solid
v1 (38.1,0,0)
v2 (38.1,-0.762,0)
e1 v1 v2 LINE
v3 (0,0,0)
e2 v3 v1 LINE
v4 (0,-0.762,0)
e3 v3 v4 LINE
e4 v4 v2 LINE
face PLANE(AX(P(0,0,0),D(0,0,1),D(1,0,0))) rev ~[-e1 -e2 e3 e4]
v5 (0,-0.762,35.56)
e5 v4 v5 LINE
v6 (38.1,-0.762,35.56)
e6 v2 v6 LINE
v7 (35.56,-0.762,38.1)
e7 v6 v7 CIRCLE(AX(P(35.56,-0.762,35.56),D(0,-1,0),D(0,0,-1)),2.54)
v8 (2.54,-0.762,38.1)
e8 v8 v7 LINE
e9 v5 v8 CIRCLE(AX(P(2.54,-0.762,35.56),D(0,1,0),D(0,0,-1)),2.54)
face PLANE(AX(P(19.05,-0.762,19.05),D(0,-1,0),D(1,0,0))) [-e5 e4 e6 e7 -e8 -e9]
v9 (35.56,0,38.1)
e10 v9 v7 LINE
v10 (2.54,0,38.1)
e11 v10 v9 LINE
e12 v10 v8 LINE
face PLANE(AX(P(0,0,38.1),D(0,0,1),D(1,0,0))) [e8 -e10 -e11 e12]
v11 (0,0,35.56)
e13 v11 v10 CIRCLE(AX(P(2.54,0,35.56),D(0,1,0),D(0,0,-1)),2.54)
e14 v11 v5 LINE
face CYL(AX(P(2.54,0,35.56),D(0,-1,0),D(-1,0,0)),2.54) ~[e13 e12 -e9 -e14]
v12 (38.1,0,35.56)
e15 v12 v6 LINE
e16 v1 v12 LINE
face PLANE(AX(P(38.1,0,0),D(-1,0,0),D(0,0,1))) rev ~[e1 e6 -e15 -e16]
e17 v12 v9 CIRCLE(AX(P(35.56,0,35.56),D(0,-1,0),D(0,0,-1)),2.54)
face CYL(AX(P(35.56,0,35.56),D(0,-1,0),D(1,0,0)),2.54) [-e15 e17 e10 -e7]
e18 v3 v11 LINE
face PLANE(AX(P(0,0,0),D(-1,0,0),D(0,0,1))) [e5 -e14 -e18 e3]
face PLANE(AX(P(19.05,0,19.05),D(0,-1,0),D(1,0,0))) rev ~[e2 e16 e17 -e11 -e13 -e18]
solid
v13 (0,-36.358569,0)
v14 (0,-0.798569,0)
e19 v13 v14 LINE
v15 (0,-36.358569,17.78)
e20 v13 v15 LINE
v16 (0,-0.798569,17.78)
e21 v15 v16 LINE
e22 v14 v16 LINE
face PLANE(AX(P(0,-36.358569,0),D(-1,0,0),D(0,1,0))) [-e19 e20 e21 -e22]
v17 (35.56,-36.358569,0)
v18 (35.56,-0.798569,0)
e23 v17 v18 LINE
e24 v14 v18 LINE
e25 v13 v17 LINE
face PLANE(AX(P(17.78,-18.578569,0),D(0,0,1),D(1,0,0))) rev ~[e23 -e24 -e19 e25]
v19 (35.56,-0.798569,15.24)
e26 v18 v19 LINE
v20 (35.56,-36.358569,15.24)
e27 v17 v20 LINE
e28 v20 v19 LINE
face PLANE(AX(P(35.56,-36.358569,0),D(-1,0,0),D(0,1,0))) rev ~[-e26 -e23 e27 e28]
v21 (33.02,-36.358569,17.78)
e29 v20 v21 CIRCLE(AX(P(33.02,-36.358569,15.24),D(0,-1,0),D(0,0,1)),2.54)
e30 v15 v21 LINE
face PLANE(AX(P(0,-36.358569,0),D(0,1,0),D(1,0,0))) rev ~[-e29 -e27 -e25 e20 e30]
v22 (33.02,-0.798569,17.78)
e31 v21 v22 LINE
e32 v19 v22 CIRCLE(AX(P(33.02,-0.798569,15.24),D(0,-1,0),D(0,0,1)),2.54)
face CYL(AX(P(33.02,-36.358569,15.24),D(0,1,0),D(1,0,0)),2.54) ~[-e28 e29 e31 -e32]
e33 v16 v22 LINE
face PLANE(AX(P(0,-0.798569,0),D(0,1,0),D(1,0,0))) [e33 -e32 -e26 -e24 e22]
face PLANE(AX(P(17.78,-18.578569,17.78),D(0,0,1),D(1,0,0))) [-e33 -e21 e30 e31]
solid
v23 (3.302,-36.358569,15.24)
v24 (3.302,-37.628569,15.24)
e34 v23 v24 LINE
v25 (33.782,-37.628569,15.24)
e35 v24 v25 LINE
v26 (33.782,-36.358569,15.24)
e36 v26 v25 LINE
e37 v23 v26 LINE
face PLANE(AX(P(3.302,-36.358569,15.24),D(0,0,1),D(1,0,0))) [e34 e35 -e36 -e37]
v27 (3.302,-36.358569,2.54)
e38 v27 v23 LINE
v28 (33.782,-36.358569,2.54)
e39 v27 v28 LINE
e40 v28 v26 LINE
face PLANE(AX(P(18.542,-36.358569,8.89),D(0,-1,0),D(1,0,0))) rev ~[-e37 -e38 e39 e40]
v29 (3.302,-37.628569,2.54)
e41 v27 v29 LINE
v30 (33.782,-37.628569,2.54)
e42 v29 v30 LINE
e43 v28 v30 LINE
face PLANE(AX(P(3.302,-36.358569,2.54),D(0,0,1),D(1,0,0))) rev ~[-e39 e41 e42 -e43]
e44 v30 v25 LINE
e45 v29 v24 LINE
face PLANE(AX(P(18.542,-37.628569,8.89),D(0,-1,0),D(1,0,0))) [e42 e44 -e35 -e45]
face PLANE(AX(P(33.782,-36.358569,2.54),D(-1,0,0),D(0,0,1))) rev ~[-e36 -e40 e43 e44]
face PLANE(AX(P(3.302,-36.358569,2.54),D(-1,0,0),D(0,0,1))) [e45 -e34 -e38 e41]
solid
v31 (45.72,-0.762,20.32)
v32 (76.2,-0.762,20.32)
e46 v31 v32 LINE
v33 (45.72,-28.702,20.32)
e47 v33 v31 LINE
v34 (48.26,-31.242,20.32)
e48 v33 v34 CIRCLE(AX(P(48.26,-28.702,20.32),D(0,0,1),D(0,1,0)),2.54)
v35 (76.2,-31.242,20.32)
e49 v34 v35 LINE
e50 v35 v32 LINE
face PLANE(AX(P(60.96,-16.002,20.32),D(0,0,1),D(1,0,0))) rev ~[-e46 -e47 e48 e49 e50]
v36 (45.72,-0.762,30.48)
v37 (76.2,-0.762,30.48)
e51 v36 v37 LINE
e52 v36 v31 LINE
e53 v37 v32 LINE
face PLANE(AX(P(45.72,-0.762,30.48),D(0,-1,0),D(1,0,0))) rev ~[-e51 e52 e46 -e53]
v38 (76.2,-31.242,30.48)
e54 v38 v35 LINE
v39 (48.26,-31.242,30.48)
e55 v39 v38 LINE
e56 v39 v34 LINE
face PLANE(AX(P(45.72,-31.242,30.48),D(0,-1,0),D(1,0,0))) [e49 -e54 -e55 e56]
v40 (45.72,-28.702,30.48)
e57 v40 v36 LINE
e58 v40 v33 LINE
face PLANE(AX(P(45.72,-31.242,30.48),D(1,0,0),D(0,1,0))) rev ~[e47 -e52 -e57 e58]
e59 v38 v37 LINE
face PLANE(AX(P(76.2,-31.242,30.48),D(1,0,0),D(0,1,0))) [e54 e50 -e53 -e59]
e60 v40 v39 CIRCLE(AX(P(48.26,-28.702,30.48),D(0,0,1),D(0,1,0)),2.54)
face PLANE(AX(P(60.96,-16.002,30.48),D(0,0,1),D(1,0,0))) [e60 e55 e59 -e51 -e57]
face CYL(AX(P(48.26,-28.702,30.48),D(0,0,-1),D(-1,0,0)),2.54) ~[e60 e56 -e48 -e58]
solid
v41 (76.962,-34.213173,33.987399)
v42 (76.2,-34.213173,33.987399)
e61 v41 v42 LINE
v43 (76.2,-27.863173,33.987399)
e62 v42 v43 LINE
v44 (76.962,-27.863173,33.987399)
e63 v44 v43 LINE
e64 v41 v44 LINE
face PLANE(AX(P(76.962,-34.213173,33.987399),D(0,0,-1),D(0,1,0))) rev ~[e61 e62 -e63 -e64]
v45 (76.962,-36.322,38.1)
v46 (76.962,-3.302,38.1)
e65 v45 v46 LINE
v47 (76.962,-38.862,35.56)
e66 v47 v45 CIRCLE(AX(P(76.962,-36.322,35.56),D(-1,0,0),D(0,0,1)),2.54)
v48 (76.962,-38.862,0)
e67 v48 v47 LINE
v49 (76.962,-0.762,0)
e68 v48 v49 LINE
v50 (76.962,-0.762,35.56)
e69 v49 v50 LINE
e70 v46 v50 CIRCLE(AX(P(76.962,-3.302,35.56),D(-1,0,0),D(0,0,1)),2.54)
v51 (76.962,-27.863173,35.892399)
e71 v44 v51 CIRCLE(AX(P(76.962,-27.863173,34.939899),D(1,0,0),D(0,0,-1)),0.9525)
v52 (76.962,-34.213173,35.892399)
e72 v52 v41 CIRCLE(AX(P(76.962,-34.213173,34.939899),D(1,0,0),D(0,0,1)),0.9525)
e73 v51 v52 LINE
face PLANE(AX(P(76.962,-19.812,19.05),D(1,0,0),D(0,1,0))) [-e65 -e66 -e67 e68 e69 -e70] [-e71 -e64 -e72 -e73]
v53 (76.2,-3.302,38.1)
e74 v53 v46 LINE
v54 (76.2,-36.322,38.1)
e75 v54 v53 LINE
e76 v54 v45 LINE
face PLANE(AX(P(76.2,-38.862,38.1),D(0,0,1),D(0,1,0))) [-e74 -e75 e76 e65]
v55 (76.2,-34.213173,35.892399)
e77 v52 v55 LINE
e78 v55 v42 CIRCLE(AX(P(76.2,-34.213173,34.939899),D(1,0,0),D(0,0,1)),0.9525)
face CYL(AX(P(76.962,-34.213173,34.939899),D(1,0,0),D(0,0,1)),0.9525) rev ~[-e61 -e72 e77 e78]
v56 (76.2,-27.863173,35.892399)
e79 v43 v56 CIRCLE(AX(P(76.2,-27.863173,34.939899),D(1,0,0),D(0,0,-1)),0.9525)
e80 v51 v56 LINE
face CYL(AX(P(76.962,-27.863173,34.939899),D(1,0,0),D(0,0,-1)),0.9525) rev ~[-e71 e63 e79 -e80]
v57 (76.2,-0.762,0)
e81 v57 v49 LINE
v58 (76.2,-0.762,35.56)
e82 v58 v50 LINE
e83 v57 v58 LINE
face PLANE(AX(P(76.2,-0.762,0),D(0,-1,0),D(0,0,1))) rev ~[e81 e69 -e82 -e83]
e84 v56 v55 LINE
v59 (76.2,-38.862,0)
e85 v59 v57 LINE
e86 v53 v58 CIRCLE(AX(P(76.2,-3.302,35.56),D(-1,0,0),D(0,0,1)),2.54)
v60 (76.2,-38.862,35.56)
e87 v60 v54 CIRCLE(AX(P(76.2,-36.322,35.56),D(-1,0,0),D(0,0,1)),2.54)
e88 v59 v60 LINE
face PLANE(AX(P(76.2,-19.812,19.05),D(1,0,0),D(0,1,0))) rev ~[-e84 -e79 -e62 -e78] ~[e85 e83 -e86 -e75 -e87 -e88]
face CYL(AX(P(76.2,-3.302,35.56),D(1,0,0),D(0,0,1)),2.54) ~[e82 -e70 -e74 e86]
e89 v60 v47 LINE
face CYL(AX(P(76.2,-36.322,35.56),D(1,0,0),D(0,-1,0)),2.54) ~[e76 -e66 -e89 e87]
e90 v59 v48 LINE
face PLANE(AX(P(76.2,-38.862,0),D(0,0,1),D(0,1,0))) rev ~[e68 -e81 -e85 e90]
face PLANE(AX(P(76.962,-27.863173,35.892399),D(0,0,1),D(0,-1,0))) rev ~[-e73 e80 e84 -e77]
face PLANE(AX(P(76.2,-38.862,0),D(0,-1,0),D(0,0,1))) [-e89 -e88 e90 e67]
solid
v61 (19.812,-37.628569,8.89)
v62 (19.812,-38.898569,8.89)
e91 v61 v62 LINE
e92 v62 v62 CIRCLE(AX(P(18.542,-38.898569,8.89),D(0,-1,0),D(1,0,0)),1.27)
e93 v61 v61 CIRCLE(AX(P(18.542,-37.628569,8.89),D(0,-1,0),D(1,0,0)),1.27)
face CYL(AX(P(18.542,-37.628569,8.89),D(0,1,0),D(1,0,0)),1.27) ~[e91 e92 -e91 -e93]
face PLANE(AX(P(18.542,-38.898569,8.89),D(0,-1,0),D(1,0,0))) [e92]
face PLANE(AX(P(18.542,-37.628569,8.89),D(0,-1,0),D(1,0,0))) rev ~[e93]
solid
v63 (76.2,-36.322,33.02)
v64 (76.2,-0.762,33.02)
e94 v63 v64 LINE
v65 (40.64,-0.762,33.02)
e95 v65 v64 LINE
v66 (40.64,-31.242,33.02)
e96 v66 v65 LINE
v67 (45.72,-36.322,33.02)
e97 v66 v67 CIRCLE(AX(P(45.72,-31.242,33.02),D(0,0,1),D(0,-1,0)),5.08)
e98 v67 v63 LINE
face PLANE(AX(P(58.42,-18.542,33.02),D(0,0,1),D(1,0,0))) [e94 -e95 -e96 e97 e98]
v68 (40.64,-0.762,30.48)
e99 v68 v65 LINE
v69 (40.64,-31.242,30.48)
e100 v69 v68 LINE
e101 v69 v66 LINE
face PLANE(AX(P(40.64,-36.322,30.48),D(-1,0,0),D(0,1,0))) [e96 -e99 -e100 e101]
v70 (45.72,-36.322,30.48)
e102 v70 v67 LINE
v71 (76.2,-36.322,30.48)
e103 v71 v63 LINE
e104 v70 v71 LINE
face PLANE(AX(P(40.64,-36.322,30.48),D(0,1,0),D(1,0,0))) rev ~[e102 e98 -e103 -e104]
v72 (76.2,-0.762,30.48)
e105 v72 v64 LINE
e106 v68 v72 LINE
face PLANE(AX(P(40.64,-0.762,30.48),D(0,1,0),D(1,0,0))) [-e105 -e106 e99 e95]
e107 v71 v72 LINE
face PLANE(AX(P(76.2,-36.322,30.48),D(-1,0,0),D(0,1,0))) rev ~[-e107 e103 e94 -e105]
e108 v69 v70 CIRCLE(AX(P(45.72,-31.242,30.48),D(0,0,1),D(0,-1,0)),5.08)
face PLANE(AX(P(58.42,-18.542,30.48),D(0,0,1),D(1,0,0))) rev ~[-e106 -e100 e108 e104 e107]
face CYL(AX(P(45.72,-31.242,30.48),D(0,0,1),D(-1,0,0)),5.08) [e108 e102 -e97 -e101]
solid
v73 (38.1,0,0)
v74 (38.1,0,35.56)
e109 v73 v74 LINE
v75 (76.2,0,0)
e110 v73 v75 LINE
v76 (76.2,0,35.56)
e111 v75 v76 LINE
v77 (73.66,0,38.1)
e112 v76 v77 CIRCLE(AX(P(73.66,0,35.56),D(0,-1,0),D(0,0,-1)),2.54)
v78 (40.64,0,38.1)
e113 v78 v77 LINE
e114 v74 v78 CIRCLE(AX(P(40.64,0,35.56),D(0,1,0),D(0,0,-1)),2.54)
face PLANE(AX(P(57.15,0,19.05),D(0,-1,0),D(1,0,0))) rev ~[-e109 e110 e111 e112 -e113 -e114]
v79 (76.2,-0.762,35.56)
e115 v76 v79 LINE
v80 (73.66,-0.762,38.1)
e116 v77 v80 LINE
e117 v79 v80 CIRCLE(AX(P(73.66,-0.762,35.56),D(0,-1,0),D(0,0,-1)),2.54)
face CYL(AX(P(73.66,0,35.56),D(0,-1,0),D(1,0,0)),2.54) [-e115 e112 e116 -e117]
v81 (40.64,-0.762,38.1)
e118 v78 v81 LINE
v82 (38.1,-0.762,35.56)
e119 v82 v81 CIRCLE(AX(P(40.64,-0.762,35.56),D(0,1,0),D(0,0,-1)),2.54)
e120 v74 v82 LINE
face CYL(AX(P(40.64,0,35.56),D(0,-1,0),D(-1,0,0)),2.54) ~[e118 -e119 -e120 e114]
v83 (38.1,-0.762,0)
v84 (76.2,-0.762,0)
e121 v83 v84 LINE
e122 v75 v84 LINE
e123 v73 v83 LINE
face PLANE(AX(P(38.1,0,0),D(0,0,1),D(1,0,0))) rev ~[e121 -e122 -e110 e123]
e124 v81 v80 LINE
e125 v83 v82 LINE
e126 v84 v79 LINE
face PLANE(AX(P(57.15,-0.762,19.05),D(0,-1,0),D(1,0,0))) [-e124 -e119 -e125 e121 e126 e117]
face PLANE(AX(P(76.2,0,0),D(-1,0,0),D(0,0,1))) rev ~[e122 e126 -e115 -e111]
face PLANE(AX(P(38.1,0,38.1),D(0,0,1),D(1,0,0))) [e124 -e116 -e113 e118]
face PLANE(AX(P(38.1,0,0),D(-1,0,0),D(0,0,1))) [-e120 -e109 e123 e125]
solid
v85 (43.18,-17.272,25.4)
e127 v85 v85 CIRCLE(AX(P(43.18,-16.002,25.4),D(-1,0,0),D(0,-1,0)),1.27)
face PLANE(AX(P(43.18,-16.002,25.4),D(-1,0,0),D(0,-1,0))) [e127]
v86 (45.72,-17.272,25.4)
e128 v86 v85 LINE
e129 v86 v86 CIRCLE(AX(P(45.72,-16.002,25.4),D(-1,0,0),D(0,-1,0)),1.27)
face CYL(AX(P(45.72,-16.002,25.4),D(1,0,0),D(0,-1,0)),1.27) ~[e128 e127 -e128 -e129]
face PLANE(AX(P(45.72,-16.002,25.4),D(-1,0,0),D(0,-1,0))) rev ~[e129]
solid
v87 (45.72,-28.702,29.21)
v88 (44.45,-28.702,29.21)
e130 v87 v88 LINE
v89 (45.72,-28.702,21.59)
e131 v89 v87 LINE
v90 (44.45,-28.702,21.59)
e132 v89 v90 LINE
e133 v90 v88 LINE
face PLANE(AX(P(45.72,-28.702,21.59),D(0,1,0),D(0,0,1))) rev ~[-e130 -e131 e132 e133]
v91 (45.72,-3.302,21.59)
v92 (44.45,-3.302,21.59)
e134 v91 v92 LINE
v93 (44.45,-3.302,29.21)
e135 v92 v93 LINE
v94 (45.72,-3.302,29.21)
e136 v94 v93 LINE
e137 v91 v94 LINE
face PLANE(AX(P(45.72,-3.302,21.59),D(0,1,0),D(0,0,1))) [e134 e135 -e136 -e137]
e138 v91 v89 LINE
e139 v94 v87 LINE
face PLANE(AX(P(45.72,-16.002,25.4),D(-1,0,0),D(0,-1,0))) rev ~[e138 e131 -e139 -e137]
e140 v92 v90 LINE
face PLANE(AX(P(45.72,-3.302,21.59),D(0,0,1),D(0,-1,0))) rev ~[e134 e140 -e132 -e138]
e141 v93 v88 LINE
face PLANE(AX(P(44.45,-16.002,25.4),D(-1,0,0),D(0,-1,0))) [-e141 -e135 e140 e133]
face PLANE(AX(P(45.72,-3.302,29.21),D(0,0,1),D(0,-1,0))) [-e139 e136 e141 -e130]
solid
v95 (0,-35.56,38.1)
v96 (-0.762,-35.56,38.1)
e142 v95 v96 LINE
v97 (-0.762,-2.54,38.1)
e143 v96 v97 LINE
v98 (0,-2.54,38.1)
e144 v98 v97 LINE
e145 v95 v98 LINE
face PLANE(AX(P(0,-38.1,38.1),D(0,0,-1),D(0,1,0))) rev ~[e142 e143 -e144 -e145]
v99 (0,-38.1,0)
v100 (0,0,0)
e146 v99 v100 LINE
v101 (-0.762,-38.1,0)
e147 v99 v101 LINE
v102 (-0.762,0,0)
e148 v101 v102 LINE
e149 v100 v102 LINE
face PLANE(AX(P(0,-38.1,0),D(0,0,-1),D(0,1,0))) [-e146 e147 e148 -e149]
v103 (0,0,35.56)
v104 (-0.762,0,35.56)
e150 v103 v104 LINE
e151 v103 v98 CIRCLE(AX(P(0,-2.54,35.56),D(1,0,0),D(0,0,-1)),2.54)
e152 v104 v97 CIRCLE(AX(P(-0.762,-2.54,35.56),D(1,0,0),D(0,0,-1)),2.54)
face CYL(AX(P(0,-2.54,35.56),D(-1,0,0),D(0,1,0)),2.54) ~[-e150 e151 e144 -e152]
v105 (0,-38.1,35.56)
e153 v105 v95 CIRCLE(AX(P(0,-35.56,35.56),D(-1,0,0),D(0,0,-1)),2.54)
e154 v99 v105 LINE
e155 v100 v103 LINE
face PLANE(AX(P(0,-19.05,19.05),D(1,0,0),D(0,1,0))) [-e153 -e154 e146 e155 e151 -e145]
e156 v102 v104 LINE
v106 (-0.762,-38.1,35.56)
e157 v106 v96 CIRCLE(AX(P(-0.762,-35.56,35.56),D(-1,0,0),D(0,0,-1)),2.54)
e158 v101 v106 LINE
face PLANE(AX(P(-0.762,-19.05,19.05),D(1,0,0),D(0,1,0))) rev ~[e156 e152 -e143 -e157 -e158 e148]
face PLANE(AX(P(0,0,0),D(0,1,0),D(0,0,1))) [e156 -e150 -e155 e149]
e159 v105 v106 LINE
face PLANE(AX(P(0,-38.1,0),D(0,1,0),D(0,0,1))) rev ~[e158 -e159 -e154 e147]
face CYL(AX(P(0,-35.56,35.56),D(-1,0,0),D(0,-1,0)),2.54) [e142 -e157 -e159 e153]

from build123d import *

# Parameters (mm, degrees)
F0_W      = 38.1
F0_H      = 38.1
F2_DEPTH  = 0.762
F1_W      = 38.1
F1_H      = 38.1
F3_DEPTH  = 0.762
F4_W      = 35.56
F4_H      = 35.56
F5_DEPTH  = 17.78
F8_W      = 30.48
F8_H      = 30.48
F9_DEPTH  = 10.16
F7_W      = 35.56
F7_H      = 35.56
F10_DEPTH = 2.54
F11_W     = 30.48
F11_H     = 12.7
F12_DEPTH = 1.27
F13_R     = 1.27
F14_DEPTH = 1.27
F16_R     = 1.27
F17_DEPTH = 2.54
F15_W     = 25.4
F15_H     = 7.62
F18_DEPTH = 1.27
F19_R     = 2.54
F19_2_R   = 2.54
F19_3_R   = 2.54
F19_4_R   = 2.54
F20_R     = 5.08
F23_DEPTH = 12.7
F24_DEPTH = 0.762
F26_W     = 38.1
F26_H     = 38.1
F27_DEPTH = 0.762
F29_DEPTH = 12.7
F30_R     = 2.54
F30_2_R   = 2.54


# Not quite as in the source:
# - two fillets or chamfers of one size are made in one step
# - a feature names something its author has since deleted; it is built from what else it names


with BuildPart() as f2:
    # F0 (on Right) → F2 (new body)
    with BuildSketch(Plane.YZ):
        with Locations((-19.05, 19.05)):
            Rectangle(F0_W, F0_H)
    extrude(amount=-F2_DEPTH)

    # F19
    f19_edges = [f2.edges().sort_by_distance(p)[0] for p in [
        (-0.381, -38.1, 38.1),
        (-0.381, 0, 38.1),
    ]]
    fillet(f19_edges, radius=F19_R)

    # F22 (on face) → F23 (cut)
    with BuildSketch(Plane.YZ):
        with BuildLine():
            ThreePointArc((35.283215344, 34.4806989491), (34.330715344, 35.4331989491), (33.378215344, 34.4806989491))
            Line((33.378215344, 34.4806989491), (33.378215344, 28.1306989491))
            ThreePointArc((33.378215344, 28.1306989491), (34.330715344, 27.1781989491), (35.283215344, 28.1306989491))
            Line((35.283215344, 28.1306989491), (35.283215344, 34.4806989491))
        make_face()
    extrude(amount=-F23_DEPTH, mode=Mode.SUBTRACT)


with BuildPart() as f3:
    # F1 (on Front) → F3 (new body)
    with BuildSketch(Plane.XZ):
        with Locations((19.05, 19.05)):
            Rectangle(F1_W, F1_H)
    extrude(amount=F3_DEPTH)

    # F19#2
    f19_2_edges = [f3.edges().sort_by_distance(p)[0] for p in [
        (0, -0.381, 38.1),
        (38.1, -0.381, 38.1),
    ]]
    fillet(f19_2_edges, radius=F19_2_R)


with BuildPart() as f5:
    # F4 (on Top) → F5 (new body)
    with BuildSketch(Plane.XY):
        with Locations((17.78, -18.5785688174)):
            Rectangle(F4_W, F4_H)
    extrude(amount=F5_DEPTH)

    # F19#3
    f19_3_edges = [f5.edges().sort_by_distance(p)[0] for p in [
        (35.56, -18.578569, 17.78),
    ]]
    fillet(f19_3_edges, radius=F19_3_R)


with BuildPart() as f9:
    # F8 (on offset) → F9 (new body)
    with BuildSketch(Plane.XY.offset(30.48)):
        with Locations((60.96, -16.002)):
            Rectangle(F8_W, F8_H)
    extrude(amount=-F9_DEPTH)

    # F19#4
    f19_4_edges = [f9.edges().sort_by_distance(p)[0] for p in [
        (45.72, -31.242, 25.4),
    ]]
    fillet(f19_4_edges, radius=F19_4_R)


with BuildPart() as f10:
    # F7 (on offset) → F10 (new body)
    with BuildSketch(Plane.XY.offset(30.48)):
        with Locations((58.42, -18.542)):
            Rectangle(F7_W, F7_H)
    extrude(amount=F10_DEPTH)

    # F20
    f20_edges = [f10.edges().sort_by_distance(p)[0] for p in [
        (40.64, -36.322, 31.75),
    ]]
    fillet(f20_edges, radius=F20_R)


with BuildPart() as f12:
    # F11 (on face) → F12 (new body)
    with BuildSketch(Plane.XZ.offset(36.3585688174)):
        with Locations((18.542, 8.89)):
            Rectangle(F11_W, F11_H)
    extrude(amount=F12_DEPTH)


with BuildPart() as f14:
    # F13 (on face) → F14 (new body)
    with BuildSketch(Plane.XZ.offset(37.6285688174)):
        with Locations((18.542, 8.89)):
            Circle(F13_R)
    extrude(amount=F14_DEPTH)


with BuildPart() as f17:
    # F16 (on face) → F17 (new body)
    with BuildSketch(Plane(origin=(45.72, 0, 0), x_dir=(0, -1, 0), z_dir=(-1, 0, 0))):
        with Locations((16.002, 25.4)):
            Circle(F16_R)
    extrude(amount=F17_DEPTH)


with BuildPart() as f18:
    # F15 (on face) → F18 (new body)
    with BuildSketch(Plane(origin=(45.72, 0, 0), x_dir=(0, -1, 0), z_dir=(-1, 0, 0))):
        with Locations((16.002, 25.4)):
            Rectangle(F15_W, F15_H)
    extrude(amount=F18_DEPTH)


with BuildPart() as f24:
    # F1 (on Front) → F24 (new body)
    with BuildSketch(Plane.XZ):
        with Locations((57.15, 19.05)):
            Rectangle(F1_W, F1_H)
    extrude(amount=F24_DEPTH)

    # F30
    f30_edges = [f24.edges().sort_by_distance(p)[0] for p in [
        (76.2, -0.381, 38.1),
        (38.1, -0.381, 38.1),
    ]]
    fillet(f30_edges, radius=F30_R)


with BuildPart() as f27:
    # F26 (on offset) → F27 (new body)
    with BuildSketch(Plane.YZ.offset(76.2)):
        with Locations((-19.812, 19.05)):
            Rectangle(F26_W, F26_H)
    extrude(amount=F27_DEPTH)

    # F28 (on face) → F29 (cut)
    with BuildSketch(Plane.YZ.offset(76.962)):
        with BuildLine():
            Line((-27.8631728142, 35.8923991907), (-34.2131728142, 35.8923991907))
            ThreePointArc((-34.2131728142, 35.8923991907), (-35.1656728142, 34.9398991907), (-34.2131728142, 33.9873991907))
            Line((-34.2131728142, 33.9873991907), (-27.8631728142, 33.9873991907))
            ThreePointArc((-27.8631728142, 33.9873991907), (-26.9106728142, 34.9398991907), (-27.8631728142, 35.8923991907))
        make_face()
    extrude(amount=-F29_DEPTH, mode=Mode.SUBTRACT)

    # F30#2
    f30_2_edges = [f27.edges().sort_by_distance(p)[0] for p in [
        (76.581, -0.762, 38.1),
        (76.581, -38.862, 38.1),
    ]]
    fillet(f30_2_edges, radius=F30_2_R)


solid = Compound([f2.part, f3.part, f5.part, f9.part, f10.part, f12.part, f14.part, f17.part, f18.part, f24.part, f27.part])
